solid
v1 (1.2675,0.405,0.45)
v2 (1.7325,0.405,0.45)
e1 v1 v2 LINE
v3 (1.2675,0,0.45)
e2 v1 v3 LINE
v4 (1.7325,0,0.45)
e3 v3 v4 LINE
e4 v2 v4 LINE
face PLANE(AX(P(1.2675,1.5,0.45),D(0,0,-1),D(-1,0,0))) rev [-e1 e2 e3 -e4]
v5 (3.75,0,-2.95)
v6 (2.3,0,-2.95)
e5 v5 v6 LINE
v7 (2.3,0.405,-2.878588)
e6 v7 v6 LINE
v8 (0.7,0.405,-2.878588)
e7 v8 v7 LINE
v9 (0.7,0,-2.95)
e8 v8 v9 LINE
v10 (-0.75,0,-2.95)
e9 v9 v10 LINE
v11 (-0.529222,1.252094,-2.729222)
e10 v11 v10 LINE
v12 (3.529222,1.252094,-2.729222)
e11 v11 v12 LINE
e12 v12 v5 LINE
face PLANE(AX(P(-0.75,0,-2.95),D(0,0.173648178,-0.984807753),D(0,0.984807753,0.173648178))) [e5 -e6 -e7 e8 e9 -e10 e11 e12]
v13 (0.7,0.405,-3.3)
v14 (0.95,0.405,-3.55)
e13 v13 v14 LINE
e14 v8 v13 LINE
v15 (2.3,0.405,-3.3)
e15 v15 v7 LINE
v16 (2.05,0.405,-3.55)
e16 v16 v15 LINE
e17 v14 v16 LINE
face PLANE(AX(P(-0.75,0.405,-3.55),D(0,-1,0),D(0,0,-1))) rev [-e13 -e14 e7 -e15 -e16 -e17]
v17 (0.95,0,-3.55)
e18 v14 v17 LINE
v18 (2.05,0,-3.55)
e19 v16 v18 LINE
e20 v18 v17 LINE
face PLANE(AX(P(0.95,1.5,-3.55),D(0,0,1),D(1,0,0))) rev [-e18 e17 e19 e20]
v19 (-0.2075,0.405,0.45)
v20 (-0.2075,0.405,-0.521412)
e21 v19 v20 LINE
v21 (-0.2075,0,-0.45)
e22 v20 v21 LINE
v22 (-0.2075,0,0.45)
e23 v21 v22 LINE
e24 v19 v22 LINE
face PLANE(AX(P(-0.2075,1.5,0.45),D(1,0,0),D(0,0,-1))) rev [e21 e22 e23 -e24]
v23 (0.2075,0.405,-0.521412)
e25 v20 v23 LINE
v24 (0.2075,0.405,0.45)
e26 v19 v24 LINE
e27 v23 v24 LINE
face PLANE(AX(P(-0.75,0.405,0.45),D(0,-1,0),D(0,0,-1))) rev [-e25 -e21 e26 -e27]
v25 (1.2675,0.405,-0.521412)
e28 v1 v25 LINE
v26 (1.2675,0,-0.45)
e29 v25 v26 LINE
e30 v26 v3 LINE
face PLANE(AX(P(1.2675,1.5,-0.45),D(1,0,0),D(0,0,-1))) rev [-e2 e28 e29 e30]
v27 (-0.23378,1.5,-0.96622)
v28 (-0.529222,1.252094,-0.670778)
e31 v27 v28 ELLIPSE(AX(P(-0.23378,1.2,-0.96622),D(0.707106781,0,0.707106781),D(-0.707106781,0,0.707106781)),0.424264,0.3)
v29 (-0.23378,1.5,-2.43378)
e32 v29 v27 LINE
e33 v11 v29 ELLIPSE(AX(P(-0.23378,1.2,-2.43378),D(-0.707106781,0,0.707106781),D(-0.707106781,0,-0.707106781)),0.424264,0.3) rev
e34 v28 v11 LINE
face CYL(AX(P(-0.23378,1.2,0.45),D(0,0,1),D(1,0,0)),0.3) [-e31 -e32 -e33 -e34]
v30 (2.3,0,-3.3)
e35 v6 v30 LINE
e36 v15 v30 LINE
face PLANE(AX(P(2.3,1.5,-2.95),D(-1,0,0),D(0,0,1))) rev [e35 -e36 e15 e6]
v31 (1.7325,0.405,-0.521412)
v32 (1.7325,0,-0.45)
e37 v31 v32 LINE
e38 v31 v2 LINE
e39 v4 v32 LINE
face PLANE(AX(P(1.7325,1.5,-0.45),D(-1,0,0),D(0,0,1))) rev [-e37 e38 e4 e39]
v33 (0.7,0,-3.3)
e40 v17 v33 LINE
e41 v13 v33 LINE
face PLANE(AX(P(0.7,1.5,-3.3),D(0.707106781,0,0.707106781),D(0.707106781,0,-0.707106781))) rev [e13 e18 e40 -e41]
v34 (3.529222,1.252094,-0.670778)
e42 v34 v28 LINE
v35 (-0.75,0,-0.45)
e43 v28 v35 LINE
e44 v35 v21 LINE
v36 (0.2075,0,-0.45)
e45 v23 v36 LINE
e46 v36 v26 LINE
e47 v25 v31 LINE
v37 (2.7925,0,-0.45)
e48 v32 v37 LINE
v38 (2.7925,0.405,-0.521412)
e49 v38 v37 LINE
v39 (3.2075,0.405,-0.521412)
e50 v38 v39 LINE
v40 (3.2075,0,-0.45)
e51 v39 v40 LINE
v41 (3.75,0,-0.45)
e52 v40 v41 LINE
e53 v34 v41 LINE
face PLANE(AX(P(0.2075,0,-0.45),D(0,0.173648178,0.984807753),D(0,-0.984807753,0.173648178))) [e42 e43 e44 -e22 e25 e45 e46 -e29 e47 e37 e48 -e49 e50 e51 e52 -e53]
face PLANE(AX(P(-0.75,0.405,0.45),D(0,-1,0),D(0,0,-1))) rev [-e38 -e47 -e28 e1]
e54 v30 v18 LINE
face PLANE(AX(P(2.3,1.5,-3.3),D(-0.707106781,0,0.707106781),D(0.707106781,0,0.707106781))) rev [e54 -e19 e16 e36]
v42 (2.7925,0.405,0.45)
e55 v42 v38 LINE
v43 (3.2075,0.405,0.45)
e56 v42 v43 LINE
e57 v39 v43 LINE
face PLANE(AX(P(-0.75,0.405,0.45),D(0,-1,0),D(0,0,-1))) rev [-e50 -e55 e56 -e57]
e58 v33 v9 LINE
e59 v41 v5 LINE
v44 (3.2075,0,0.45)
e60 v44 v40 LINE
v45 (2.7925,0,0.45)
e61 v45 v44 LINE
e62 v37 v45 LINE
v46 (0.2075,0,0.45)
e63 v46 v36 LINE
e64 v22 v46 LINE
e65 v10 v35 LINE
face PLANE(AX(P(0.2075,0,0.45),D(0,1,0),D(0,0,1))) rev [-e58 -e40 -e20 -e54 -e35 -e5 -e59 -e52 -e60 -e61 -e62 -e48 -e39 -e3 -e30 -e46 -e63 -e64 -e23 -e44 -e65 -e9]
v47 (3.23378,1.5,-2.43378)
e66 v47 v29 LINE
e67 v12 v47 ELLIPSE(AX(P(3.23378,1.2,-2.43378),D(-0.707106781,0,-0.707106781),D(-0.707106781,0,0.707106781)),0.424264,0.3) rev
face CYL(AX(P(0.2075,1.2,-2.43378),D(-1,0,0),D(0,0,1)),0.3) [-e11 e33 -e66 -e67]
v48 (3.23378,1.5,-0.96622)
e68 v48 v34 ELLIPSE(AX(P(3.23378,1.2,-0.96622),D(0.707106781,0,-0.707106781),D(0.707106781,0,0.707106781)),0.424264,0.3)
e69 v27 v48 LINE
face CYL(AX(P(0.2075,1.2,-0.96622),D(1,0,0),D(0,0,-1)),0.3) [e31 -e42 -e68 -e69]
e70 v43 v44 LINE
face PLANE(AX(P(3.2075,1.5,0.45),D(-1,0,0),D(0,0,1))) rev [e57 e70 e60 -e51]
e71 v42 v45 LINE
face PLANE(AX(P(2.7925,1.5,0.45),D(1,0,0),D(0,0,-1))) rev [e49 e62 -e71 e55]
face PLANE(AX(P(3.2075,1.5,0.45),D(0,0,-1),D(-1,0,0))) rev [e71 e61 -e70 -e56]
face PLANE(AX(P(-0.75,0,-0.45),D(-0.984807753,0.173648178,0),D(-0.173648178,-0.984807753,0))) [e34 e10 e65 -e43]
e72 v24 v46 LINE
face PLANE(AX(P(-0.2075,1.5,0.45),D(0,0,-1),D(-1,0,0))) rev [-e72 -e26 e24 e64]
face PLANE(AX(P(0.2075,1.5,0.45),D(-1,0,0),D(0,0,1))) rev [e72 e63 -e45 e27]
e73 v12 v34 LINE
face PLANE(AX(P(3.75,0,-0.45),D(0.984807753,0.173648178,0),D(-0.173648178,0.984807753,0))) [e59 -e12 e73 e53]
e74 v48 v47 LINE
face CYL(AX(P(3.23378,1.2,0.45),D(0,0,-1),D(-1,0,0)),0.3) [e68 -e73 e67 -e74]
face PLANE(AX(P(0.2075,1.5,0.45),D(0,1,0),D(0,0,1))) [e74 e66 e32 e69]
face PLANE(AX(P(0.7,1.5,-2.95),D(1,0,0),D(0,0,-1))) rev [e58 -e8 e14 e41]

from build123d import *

# Parameters (mm, degrees)
BASE_EXTRUDE_DEPTH = 1.5
SKETCH2_W          = 0.9
SKETCH2_H          = 1.095
SKETCH2_W_2        = 0.6
LEADS_DEPTH        = 6.924736281
DRAFT1_START       = -2.95
DRAFT1_DEPTH       = 2.5
DRAFT1_START_2     = -2
DRAFT1_2_DEPTH     = 7
DRAFT1_3_DEPTH     = 2.7
DRAFT1_START_3     = 2.3
DRAFT1_4_DEPTH     = 2.7
DRAFT1_START_4     = 0.2075
DRAFT1_5_DEPTH     = 1.06
DRAFT1_START_5     = 1.7325
DRAFT1_6_DEPTH     = 1.06
DRAFT1_7_DEPTH     = 1.7925
DRAFT1_START_6     = 3.2075
DRAFT1_8_DEPTH     = 1.7925
FILLET1_R          = 0.3


with BuildPart() as part:
    # Sketch1 → Base-Extrude (new body)
    with BuildSketch(Plane(origin=(0, 0, 0), x_dir=(1, 0, 0), z_dir=(0, 1, 0))):
        Polygon((-0.2075, -0.45), (-0.2075, 0.45), (-0.75, 0.45), (-0.75, 2.95), (0.7, 2.95), (0.7, 3.3), (0.95, 3.55), (2.05, 3.55), (2.3, 3.3), (2.3, 2.95), (3.75, 2.95), (3.75, 0.45), (3.2075, 0.45), (3.2075, -0.45), (2.7925, -0.45), (2.7925, 0.45), (1.7325, 0.45), (1.7325, -0.45), (1.2675, -0.45), (1.2675, 0.45), (0.2075, 0.45), (0.2075, -0.45), align=None)
    extrude(amount=BASE_EXTRUDE_DEPTH)

    # Sketch2 → Leads (cut, through all)
    with BuildSketch(Plane(origin=(3.75, 0, 0), x_dir=(0, 0, -1), z_dir=(1, 0, 0))):
        with Locations((0, 0.9525)):
            Rectangle(SKETCH2_W, SKETCH2_H)
        with Locations((3.25, 0.9525)):
            Rectangle(SKETCH2_W_2, SKETCH2_H)
    extrude(amount=-LEADS_DEPTH, mode=Mode.SUBTRACT)

    # Draft1: read off the stored shape, not the designer's step
    # Draft1 outline → Draft1 (cut)
    with BuildSketch(Plane.XY.offset(DRAFT1_START)):
        Polygon((-0.75, 0), (-0.485509529, 1.5), (-0.75, 1.5), align=None)
        Polygon((3.485509529, 1.5), (3.75, 0), (3.75, 1.5), align=None)
    extrude(amount=DRAFT1_DEPTH, mode=Mode.SUBTRACT)

    # Draft1 2 outline → Draft1 2 (cut)
    with BuildSketch(Plane.YZ.offset(DRAFT1_START_2)):
        Polygon((0.405, -0.521412427), (1.5, -0.714490471), (1.5, -0.45), (0.405, -0.45), align=None)
        Polygon((1.5, -2.685509529), (0.405, -2.878587573), (0.405, -2.95), (1.5, -2.95), align=None)
    extrude(amount=DRAFT1_2_DEPTH, mode=Mode.SUBTRACT)

    # Draft1 3 outline → Draft1 3 (cut)
    with BuildSketch(Plane.YZ.offset(DRAFT1_START_2)):
        Polygon((0.405, -2.878587573), (0, -2.95), (0.405, -2.95), align=None)
    extrude(amount=DRAFT1_3_DEPTH, mode=Mode.SUBTRACT)

    # Draft1 4 outline → Draft1 4 (cut)
    with BuildSketch(Plane.YZ.offset(DRAFT1_START_3)):
        Polygon((0.405, -2.878587573), (0, -2.95), (0.405, -2.95), align=None)
    extrude(amount=DRAFT1_4_DEPTH, mode=Mode.SUBTRACT)

    # Draft1 5 outline → Draft1 5 (cut)
    with BuildSketch(Plane.YZ.offset(DRAFT1_START_4)):
        Polygon((0, -0.45), (0.405, -0.521412427), (0.405, -0.45), align=None)
    extrude(amount=DRAFT1_5_DEPTH, mode=Mode.SUBTRACT)

    # Draft1 6 outline → Draft1 6 (cut)
    with BuildSketch(Plane.YZ.offset(DRAFT1_START_5)):
        Polygon((0, -0.45), (0.405, -0.521412427), (0.405, -0.45), align=None)
    extrude(amount=DRAFT1_6_DEPTH, mode=Mode.SUBTRACT)

    # Draft1 7 outline → Draft1 7 (cut)
    with BuildSketch(Plane.YZ.offset(DRAFT1_START_2)):
        Polygon((0, -0.45), (0.405, -0.521412427), (0.405, -0.45), align=None)
    extrude(amount=DRAFT1_7_DEPTH, mode=Mode.SUBTRACT)

    # Draft1 8 outline → Draft1 8 (cut)
    with BuildSketch(Plane.YZ.offset(DRAFT1_START_6)):
        Polygon((0, -0.45), (0.405, -0.521412427), (0.405, -0.45), align=None)
    extrude(amount=DRAFT1_8_DEPTH, mode=Mode.SUBTRACT)

    # Fillet1
    fillet1_edges = [part.edges().sort_by_distance(p)[0] for p in [
        (1.5, 1.5, -0.714490471),
        (3.485509529, 1.5, -1.7),
        (1.5, 1.5, -2.685509529),
        (-0.485509529, 1.5, -1.7),
    ]]
    fillet(fillet1_edges, radius=FILLET1_R)


solid = part.part
